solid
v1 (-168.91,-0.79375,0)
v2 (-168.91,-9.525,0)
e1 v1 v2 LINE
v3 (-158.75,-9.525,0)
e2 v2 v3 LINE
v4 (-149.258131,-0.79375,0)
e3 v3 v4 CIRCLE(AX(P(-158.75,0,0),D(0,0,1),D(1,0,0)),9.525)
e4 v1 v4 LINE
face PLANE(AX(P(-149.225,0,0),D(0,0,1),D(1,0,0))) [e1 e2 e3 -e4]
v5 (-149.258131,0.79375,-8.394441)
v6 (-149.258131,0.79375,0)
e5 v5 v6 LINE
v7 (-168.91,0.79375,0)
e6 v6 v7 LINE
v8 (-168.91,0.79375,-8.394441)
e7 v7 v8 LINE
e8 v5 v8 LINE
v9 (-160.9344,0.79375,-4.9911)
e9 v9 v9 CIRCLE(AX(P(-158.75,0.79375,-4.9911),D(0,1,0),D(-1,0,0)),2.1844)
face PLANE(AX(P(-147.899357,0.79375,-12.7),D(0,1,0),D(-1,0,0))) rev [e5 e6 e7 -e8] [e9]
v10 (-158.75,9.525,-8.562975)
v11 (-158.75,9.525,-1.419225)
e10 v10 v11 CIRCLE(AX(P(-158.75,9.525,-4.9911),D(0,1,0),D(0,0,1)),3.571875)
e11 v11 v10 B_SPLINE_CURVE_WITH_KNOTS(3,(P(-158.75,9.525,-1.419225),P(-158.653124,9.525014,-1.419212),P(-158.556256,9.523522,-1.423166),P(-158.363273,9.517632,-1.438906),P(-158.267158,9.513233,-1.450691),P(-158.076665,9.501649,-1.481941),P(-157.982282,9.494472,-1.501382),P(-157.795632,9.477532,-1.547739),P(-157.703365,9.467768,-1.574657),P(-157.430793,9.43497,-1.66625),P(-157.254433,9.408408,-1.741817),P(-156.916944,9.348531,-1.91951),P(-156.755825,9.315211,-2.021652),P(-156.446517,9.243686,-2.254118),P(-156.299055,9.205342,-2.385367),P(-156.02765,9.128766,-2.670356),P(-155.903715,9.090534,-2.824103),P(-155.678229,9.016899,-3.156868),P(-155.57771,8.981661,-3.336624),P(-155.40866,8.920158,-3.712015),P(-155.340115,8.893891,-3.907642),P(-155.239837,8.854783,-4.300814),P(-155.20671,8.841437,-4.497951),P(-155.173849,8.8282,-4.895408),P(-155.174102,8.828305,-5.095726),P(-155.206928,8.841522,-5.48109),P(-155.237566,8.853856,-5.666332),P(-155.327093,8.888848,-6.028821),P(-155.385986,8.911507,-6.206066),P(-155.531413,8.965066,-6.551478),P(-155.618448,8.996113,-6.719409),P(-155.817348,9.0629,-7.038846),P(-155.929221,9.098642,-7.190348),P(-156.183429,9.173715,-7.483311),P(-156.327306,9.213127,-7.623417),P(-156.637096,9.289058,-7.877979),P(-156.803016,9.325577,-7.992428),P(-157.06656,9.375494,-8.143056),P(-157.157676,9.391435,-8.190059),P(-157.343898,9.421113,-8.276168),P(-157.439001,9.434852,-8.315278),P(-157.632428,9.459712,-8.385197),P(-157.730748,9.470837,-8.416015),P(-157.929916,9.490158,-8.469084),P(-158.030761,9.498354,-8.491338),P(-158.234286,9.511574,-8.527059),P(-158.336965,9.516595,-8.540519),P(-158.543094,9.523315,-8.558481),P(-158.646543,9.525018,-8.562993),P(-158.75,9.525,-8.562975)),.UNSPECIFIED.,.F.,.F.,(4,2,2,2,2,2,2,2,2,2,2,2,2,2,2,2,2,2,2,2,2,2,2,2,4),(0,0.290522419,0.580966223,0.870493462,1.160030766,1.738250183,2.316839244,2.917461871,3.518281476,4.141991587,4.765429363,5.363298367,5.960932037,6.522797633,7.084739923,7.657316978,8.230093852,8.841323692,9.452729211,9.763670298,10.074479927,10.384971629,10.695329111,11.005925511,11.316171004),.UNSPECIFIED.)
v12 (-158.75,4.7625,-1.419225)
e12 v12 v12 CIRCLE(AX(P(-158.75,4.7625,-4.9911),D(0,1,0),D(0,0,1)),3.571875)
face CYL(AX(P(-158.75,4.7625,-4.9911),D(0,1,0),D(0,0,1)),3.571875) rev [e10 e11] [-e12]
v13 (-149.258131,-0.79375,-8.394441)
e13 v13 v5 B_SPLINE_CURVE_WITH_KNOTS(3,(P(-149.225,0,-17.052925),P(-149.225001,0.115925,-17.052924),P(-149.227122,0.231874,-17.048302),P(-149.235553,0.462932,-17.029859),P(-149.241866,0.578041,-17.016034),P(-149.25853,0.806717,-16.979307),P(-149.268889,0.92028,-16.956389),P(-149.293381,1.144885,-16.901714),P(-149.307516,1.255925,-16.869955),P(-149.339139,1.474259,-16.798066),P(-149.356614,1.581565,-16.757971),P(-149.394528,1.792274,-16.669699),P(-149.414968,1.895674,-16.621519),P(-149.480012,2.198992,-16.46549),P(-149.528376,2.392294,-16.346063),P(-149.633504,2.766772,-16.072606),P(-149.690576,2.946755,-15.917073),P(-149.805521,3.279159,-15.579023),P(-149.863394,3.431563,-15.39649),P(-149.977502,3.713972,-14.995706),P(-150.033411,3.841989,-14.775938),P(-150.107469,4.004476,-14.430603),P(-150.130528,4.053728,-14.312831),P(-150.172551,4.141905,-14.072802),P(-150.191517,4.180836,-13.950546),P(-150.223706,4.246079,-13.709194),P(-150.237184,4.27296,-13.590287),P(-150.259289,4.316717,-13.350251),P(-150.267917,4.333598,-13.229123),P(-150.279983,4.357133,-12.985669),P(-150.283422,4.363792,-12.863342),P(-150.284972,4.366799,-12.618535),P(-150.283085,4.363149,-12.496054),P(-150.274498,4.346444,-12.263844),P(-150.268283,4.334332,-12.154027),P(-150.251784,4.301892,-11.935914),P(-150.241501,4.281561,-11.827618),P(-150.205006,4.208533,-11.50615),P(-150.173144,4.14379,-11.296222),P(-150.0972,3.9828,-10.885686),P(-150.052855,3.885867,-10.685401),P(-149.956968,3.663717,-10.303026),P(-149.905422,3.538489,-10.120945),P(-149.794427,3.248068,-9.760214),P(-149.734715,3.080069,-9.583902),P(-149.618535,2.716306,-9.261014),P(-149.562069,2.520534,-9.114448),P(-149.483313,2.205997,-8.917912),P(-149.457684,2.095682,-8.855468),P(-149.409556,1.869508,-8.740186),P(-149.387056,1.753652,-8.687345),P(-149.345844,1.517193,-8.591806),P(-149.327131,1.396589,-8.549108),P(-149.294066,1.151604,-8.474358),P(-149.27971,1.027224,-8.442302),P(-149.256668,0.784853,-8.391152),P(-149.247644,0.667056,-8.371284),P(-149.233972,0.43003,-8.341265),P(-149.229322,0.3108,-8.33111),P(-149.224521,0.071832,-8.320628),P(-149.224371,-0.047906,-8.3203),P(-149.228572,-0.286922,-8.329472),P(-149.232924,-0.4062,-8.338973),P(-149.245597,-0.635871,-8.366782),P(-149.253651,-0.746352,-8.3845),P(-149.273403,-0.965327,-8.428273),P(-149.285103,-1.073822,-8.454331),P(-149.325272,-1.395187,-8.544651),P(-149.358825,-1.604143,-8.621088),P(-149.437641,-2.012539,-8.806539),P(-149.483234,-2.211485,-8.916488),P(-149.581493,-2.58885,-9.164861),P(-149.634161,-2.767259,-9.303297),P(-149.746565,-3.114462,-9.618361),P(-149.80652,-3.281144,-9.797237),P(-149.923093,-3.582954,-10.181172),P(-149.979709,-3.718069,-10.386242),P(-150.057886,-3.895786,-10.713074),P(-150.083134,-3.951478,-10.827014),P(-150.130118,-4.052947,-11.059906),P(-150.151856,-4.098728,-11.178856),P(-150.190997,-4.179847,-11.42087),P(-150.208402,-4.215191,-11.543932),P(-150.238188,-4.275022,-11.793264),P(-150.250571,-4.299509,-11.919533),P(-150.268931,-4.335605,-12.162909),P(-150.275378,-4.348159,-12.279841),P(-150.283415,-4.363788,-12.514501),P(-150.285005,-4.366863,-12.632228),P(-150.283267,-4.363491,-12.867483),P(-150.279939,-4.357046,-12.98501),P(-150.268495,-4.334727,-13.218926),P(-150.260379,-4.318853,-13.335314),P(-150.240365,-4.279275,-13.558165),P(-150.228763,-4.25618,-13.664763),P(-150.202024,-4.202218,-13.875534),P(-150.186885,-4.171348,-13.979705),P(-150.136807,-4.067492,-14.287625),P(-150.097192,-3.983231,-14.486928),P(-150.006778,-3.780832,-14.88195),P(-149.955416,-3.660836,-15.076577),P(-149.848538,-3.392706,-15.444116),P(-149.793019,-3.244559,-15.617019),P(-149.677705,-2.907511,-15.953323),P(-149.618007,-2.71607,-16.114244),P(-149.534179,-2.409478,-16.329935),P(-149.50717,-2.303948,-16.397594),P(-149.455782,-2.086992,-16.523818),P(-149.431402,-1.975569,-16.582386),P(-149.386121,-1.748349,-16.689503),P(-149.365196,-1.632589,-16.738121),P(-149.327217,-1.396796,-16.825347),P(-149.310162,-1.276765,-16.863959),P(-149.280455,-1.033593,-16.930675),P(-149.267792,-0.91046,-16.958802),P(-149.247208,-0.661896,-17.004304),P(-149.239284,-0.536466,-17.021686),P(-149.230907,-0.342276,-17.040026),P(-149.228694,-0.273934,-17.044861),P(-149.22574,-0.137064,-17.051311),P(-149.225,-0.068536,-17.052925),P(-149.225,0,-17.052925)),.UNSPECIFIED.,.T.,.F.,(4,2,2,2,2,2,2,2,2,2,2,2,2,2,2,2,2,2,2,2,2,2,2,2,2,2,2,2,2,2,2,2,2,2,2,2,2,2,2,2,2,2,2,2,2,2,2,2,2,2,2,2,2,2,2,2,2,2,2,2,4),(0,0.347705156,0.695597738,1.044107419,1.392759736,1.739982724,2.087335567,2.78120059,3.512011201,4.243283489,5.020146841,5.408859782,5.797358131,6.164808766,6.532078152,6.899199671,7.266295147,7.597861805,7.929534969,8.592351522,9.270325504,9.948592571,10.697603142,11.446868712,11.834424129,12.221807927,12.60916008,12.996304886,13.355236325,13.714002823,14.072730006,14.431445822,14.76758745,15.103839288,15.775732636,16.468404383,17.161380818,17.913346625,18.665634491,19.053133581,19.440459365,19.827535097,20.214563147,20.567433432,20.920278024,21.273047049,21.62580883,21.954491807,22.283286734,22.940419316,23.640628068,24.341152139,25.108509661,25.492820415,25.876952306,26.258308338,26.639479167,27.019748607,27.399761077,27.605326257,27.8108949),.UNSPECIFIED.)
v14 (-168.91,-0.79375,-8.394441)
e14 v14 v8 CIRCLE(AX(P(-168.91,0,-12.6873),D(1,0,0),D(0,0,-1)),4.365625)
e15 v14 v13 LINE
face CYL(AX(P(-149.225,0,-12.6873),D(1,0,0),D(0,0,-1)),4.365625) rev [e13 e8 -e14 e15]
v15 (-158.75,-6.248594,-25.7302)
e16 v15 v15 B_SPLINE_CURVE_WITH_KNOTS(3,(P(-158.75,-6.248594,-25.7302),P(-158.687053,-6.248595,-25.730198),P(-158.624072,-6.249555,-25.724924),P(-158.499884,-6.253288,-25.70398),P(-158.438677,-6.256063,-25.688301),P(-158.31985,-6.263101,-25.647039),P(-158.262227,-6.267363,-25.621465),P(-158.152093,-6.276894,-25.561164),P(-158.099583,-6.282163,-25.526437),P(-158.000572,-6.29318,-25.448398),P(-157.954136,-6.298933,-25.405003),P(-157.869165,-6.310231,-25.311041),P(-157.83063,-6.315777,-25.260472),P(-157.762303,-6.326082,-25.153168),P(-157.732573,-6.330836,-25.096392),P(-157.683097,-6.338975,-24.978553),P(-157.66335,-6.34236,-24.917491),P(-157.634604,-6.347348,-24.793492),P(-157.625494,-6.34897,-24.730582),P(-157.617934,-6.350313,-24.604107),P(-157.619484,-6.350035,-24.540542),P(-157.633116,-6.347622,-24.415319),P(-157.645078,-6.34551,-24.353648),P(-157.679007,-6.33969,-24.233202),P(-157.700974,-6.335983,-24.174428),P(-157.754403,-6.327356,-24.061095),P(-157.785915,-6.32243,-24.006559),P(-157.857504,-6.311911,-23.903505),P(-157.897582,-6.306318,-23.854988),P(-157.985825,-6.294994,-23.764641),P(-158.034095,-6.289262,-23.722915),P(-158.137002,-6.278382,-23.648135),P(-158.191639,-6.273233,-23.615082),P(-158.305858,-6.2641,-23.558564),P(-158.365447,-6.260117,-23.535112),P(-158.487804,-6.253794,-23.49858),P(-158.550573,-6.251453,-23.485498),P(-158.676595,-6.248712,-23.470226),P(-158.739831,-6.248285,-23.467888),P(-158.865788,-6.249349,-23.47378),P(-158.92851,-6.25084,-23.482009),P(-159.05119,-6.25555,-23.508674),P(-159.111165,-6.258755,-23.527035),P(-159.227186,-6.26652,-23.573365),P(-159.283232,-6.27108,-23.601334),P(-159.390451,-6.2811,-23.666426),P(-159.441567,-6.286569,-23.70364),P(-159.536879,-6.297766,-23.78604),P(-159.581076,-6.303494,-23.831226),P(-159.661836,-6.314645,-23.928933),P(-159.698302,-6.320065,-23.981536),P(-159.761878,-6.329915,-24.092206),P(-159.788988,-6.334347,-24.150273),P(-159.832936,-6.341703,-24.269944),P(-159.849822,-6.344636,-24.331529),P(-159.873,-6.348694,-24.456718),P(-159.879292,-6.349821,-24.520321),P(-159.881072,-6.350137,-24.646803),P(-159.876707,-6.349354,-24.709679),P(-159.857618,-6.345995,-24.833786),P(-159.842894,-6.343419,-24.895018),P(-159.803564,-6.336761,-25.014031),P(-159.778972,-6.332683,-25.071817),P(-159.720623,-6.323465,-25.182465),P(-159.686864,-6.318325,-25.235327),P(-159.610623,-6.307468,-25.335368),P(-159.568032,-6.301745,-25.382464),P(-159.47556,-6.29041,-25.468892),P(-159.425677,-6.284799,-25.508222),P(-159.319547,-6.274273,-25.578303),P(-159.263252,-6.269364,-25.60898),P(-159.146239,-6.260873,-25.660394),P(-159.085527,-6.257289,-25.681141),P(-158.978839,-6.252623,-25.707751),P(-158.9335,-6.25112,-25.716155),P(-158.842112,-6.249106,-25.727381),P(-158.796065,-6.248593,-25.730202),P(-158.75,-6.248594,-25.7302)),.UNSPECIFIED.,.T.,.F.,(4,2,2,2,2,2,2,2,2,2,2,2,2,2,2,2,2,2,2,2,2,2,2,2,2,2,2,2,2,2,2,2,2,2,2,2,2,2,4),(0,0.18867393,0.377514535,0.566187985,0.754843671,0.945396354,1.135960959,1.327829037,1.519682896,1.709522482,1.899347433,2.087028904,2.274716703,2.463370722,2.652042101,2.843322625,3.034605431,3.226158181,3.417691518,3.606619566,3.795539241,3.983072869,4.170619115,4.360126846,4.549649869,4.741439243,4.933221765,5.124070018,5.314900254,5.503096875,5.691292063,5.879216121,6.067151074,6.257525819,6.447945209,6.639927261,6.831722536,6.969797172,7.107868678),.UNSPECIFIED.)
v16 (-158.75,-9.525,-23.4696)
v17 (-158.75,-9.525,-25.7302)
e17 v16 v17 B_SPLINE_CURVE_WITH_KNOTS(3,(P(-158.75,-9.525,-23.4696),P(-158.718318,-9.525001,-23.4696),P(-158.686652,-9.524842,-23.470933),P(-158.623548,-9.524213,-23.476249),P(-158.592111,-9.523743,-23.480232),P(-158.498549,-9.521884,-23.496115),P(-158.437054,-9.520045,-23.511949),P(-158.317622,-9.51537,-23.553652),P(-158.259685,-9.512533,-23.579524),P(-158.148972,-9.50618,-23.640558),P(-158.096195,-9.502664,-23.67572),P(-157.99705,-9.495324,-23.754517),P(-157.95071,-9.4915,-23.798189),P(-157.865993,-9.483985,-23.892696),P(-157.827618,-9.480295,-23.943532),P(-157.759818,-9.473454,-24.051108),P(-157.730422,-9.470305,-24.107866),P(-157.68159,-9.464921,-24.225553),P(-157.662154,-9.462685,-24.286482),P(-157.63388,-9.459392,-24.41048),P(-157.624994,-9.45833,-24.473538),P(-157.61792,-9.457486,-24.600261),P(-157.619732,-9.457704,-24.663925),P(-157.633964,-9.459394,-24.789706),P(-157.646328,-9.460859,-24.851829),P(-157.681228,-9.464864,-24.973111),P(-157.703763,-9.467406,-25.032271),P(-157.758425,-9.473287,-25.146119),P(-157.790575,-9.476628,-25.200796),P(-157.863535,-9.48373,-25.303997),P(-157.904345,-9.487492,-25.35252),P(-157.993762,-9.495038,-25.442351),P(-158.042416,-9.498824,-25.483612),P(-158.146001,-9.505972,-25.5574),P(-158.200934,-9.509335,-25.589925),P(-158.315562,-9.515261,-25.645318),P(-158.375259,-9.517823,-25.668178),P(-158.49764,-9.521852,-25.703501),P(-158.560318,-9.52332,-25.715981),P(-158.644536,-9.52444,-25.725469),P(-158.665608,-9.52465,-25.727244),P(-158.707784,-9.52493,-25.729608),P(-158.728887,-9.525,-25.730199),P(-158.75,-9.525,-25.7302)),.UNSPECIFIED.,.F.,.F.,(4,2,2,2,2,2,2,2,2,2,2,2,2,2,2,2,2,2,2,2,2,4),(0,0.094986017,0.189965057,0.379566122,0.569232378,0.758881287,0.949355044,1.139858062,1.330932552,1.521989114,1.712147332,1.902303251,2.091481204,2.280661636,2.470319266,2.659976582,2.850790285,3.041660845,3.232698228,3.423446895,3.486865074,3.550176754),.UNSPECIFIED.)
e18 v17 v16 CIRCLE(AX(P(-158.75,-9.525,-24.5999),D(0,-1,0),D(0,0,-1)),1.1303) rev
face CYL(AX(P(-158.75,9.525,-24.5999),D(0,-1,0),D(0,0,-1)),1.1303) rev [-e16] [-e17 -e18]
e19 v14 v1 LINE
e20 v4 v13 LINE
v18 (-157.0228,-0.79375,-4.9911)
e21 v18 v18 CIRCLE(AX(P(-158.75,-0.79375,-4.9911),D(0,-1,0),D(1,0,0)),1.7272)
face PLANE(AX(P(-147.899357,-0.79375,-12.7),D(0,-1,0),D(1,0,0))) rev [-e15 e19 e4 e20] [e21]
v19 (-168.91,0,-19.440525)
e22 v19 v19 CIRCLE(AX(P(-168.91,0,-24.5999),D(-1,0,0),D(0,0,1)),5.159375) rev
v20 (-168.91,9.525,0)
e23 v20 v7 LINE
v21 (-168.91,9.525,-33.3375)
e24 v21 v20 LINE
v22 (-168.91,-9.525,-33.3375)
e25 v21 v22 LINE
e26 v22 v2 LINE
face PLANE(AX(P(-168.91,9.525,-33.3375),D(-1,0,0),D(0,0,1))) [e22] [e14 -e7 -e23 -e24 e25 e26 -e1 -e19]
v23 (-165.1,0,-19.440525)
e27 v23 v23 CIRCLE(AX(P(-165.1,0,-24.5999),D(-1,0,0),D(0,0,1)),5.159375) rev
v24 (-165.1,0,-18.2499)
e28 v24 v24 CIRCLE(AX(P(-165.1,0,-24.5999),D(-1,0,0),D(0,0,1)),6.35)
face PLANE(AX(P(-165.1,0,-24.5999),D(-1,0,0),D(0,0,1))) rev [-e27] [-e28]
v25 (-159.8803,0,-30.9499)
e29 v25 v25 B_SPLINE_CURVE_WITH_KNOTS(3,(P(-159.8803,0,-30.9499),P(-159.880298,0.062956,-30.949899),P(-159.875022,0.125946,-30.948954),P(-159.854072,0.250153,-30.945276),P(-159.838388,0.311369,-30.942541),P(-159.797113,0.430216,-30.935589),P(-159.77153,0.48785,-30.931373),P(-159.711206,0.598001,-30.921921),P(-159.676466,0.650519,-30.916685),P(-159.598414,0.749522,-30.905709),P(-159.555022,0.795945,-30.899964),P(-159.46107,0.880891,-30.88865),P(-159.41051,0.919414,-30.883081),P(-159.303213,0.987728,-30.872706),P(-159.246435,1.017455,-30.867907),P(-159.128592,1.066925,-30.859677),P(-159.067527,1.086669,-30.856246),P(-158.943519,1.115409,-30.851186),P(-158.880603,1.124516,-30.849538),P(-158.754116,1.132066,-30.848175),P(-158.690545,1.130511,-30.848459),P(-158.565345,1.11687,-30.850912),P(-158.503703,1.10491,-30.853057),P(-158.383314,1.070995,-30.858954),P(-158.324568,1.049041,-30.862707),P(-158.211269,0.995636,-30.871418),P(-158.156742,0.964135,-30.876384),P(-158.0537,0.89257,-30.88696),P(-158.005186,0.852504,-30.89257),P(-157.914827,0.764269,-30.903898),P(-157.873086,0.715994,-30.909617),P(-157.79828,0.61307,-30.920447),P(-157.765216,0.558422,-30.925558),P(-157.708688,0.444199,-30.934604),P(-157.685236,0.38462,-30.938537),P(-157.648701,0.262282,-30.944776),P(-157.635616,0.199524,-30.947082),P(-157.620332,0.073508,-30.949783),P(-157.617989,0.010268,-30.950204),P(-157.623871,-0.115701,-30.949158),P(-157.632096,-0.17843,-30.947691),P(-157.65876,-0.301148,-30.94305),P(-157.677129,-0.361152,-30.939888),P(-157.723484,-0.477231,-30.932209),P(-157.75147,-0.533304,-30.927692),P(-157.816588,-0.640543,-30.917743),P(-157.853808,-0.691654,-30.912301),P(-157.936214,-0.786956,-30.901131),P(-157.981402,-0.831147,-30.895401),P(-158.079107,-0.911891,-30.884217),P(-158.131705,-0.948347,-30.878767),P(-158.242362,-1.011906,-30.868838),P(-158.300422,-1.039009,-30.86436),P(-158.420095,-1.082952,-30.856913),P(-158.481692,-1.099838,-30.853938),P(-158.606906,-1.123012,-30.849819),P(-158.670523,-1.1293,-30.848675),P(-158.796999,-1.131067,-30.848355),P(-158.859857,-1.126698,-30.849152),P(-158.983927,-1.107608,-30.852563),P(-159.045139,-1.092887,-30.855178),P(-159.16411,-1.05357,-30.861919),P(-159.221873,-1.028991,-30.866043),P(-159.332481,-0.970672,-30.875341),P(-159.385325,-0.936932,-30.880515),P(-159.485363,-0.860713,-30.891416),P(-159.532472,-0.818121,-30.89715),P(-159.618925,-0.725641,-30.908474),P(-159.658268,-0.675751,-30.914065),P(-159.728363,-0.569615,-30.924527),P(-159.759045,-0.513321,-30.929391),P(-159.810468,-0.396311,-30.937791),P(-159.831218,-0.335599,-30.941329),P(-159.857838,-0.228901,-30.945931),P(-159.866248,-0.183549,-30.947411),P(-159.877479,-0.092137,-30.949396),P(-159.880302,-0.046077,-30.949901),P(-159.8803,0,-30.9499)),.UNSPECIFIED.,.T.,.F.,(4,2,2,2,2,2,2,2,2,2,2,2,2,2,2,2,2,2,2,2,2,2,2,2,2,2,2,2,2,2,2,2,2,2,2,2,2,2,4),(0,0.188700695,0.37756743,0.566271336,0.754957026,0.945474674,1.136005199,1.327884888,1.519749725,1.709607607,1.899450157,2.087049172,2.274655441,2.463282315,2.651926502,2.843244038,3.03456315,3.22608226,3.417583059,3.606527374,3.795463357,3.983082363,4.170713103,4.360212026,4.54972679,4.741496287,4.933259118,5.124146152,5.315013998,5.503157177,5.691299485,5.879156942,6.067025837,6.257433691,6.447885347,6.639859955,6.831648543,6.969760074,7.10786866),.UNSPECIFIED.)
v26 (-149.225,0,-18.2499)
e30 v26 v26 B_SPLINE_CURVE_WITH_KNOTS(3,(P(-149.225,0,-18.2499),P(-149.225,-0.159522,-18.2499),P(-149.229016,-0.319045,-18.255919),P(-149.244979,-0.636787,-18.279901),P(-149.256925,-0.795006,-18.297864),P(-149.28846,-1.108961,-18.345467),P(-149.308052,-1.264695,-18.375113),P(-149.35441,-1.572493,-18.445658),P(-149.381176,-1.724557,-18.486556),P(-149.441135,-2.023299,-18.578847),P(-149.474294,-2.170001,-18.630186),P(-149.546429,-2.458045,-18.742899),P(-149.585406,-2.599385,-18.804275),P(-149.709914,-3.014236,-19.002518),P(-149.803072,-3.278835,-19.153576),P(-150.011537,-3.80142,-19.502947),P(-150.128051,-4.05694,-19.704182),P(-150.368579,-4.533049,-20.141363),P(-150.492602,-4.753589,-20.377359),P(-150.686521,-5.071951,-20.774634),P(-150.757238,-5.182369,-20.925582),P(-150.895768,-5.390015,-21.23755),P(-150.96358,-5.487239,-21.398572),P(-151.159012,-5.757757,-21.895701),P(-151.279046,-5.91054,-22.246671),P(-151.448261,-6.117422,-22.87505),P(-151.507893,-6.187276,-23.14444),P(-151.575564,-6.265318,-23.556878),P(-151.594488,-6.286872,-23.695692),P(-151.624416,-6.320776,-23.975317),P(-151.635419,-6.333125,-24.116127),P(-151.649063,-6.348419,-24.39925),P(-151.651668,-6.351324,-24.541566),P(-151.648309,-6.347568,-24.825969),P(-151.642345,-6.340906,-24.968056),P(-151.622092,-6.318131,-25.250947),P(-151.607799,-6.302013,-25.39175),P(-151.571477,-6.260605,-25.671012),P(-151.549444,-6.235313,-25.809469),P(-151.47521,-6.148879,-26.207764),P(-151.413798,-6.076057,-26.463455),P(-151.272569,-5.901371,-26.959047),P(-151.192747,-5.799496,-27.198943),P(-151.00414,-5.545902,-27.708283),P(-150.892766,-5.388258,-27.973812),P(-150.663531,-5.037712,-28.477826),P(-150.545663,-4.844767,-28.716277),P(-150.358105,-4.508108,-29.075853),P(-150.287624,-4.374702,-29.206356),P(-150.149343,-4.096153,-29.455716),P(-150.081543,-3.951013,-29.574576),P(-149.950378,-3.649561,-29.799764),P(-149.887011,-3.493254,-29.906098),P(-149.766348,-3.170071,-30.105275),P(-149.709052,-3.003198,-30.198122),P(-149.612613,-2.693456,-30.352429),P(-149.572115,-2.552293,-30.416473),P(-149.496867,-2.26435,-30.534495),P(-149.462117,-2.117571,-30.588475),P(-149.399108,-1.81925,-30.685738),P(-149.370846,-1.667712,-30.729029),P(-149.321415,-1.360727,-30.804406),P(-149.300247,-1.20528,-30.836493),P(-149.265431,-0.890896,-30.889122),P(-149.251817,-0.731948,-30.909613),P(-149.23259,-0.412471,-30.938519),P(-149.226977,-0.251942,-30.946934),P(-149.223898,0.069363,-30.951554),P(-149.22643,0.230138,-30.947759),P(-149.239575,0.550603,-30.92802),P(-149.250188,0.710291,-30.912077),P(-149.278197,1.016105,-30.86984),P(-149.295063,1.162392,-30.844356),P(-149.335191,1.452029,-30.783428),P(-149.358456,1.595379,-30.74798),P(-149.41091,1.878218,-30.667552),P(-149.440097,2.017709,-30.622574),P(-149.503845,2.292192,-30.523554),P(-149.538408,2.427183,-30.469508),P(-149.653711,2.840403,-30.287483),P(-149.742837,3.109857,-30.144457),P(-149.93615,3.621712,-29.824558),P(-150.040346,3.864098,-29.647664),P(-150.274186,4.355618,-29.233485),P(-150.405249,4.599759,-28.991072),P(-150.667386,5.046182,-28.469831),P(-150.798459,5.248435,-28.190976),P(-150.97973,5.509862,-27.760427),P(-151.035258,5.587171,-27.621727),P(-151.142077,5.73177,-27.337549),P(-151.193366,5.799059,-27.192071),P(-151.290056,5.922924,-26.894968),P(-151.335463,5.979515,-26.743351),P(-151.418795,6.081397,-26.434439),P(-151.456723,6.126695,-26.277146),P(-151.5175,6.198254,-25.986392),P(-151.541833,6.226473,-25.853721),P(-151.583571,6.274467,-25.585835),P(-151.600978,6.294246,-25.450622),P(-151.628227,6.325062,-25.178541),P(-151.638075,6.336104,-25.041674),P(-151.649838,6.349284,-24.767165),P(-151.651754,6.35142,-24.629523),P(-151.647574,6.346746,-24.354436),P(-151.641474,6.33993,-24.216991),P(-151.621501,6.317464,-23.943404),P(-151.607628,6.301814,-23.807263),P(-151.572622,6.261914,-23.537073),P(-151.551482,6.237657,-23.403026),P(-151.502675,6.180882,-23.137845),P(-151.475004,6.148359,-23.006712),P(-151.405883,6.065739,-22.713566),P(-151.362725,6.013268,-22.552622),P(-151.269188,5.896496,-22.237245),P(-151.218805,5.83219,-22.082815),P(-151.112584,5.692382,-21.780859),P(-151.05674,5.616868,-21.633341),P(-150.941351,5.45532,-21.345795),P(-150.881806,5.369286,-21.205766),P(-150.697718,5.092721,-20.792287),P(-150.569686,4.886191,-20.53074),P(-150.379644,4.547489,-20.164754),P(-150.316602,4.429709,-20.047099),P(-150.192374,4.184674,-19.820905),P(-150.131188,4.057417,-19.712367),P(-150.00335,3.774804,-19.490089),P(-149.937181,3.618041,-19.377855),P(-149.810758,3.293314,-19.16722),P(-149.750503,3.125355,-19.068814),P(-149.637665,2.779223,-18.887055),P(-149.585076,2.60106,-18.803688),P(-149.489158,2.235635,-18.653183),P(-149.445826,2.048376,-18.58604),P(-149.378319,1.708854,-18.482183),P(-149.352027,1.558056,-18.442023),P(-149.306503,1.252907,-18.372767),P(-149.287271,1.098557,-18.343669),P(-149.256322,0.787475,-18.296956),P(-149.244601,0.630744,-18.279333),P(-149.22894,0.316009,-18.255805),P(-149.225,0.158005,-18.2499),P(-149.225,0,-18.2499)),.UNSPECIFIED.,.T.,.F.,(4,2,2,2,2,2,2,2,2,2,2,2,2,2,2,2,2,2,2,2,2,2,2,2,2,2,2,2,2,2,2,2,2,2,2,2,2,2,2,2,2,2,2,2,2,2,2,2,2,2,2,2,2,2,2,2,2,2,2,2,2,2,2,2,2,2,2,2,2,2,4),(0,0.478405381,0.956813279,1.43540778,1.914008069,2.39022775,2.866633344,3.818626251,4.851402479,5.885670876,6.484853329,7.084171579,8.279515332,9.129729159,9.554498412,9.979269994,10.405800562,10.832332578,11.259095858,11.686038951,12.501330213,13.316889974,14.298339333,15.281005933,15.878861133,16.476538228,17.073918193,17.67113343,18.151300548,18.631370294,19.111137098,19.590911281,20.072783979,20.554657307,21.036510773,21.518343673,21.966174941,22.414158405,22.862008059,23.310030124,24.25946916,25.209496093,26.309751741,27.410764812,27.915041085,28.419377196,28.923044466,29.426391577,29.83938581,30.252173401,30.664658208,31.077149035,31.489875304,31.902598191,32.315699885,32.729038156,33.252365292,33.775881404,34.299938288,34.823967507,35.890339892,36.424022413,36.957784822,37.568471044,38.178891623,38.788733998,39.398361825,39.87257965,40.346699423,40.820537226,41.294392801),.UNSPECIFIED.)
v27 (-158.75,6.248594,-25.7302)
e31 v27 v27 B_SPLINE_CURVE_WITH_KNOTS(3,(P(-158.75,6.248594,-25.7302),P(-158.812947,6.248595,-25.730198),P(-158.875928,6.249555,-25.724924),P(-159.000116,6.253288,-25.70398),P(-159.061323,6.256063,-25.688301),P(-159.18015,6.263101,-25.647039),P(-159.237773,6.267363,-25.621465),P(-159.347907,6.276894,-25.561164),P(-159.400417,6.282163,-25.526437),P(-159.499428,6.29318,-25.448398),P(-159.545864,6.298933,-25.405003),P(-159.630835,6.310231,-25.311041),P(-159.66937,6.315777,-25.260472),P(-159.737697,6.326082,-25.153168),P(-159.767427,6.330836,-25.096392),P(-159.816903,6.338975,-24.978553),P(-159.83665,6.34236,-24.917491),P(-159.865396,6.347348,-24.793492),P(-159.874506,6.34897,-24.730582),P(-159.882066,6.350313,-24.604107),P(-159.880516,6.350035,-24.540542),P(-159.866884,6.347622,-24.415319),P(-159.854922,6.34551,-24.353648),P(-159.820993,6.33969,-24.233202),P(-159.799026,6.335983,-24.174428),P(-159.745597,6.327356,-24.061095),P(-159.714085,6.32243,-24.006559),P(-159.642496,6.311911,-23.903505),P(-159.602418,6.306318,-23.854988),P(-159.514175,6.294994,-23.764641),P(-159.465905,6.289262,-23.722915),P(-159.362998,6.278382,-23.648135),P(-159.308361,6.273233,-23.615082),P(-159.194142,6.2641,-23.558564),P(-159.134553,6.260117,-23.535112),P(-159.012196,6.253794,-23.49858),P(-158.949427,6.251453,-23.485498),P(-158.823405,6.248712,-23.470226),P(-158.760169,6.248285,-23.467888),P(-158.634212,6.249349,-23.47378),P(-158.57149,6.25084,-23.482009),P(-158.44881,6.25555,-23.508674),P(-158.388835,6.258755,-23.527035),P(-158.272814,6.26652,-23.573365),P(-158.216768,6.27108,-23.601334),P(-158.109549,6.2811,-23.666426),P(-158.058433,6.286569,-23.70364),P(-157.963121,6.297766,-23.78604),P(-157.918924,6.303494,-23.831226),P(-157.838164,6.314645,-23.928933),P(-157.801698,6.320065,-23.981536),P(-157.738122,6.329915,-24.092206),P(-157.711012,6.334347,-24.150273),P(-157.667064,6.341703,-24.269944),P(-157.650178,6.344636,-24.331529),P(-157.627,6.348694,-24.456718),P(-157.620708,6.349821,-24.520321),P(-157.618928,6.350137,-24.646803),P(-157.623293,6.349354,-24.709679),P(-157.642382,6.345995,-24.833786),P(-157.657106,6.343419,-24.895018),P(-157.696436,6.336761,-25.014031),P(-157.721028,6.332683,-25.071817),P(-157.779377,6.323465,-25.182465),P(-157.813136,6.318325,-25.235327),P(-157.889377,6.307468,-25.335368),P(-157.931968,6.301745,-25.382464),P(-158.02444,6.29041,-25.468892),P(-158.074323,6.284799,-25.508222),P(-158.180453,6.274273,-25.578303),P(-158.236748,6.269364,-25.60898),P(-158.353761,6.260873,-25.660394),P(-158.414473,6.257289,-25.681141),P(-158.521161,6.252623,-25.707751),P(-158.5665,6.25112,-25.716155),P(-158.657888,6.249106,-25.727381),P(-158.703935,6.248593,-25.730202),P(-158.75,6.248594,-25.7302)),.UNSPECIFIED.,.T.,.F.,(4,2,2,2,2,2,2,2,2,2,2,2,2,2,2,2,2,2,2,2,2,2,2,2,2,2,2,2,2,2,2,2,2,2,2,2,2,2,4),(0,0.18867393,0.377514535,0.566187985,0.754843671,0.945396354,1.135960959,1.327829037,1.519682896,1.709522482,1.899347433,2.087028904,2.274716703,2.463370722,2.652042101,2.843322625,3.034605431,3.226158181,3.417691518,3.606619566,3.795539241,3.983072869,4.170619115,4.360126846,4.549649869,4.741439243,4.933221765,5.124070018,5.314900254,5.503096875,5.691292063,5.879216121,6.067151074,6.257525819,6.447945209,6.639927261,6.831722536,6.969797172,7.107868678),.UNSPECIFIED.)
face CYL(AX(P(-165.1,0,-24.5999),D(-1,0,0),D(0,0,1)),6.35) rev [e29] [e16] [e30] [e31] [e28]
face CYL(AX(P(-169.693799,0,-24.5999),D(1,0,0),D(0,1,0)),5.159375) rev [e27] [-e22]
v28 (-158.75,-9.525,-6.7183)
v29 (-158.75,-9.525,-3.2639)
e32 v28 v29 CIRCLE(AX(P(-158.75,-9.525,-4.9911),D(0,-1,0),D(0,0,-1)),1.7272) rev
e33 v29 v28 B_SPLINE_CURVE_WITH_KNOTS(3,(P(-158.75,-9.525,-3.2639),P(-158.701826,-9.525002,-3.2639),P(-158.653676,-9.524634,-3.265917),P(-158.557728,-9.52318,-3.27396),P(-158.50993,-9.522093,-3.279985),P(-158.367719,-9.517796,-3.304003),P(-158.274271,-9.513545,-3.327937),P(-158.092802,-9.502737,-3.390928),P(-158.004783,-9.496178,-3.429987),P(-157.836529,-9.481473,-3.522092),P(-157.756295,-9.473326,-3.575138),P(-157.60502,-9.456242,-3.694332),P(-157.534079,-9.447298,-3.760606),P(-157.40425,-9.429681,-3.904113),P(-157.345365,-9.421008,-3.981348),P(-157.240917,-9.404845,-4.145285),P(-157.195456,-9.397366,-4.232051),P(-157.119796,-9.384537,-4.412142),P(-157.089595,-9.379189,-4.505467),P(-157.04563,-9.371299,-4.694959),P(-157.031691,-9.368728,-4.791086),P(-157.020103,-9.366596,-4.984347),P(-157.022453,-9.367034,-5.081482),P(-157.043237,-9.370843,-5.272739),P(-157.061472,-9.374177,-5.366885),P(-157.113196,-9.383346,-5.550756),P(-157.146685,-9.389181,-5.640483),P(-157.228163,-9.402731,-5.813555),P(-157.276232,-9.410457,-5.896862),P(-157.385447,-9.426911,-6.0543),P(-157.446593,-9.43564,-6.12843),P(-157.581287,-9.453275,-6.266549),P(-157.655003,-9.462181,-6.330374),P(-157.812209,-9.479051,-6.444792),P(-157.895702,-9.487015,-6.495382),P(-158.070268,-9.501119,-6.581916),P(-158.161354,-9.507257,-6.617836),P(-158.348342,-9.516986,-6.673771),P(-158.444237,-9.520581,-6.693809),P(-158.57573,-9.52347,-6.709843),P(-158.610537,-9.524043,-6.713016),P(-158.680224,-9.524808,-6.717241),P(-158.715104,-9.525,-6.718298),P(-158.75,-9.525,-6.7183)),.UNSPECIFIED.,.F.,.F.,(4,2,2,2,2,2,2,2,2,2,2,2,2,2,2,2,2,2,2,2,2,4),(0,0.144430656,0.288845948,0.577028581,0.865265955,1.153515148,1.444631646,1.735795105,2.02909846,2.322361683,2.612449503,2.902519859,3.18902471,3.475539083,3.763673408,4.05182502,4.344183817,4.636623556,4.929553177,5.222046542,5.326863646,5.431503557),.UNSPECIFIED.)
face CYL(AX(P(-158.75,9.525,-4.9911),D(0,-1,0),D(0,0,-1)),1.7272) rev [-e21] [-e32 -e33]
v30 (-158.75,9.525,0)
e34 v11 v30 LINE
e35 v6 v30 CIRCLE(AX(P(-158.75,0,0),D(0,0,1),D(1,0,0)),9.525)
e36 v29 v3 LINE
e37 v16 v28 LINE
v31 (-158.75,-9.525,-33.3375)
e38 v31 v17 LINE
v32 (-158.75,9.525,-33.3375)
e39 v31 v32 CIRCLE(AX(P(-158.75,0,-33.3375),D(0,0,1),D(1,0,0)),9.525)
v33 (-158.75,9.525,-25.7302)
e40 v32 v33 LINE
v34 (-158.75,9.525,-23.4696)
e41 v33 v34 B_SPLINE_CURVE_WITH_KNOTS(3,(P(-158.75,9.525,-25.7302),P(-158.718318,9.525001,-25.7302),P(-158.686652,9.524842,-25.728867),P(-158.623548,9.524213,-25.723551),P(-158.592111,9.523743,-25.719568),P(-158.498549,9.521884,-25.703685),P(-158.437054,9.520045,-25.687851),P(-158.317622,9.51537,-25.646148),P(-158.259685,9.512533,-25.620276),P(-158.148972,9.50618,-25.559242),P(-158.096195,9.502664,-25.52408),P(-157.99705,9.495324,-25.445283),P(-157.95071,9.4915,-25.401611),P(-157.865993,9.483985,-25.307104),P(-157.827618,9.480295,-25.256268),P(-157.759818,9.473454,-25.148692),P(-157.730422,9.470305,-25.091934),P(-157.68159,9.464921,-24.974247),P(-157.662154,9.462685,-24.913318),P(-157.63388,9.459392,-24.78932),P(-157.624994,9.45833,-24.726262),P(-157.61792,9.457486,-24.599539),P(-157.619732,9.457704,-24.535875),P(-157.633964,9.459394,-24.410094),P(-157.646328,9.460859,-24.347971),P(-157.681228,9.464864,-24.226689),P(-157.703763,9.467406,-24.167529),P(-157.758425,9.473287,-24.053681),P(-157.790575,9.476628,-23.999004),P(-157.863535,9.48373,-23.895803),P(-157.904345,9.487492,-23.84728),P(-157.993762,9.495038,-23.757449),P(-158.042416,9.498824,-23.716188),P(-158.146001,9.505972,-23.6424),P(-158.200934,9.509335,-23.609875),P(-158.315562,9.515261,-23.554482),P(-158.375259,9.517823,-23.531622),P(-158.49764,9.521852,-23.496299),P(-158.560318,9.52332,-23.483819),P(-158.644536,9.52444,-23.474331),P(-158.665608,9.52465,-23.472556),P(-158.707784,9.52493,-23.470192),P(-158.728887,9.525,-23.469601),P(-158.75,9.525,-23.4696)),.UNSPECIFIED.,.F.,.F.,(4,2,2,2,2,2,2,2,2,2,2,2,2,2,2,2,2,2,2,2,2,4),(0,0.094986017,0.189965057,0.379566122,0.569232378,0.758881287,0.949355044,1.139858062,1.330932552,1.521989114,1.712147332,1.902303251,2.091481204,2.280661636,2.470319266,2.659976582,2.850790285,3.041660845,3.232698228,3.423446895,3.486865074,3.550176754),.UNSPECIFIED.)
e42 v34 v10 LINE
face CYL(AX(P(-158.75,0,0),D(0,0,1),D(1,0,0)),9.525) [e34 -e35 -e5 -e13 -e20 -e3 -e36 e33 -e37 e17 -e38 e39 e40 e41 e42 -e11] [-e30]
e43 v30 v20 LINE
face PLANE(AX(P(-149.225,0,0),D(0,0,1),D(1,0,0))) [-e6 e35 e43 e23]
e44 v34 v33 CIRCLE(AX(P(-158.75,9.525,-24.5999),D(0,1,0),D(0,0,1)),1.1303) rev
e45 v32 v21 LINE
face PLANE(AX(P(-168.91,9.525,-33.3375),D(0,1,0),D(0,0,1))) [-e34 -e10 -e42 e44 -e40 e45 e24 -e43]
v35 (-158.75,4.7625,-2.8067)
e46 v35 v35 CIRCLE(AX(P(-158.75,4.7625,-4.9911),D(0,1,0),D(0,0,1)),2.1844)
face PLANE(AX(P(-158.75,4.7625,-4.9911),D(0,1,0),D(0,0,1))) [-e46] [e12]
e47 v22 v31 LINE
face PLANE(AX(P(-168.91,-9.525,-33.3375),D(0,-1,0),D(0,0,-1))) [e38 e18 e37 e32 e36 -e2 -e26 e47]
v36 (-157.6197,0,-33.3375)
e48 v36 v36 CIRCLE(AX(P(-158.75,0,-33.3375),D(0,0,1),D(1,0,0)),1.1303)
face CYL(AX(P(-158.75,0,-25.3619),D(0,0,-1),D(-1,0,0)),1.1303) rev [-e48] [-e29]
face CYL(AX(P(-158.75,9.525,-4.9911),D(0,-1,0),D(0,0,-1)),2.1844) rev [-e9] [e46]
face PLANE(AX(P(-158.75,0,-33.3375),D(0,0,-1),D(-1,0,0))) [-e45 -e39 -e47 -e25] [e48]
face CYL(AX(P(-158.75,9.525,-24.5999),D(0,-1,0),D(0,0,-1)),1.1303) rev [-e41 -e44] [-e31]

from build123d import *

# Parameters (mm, degrees)
SKETCH1_W              = 9.525
SKETCH1_H              = 33.3375
COMBINE1_START         = -165.1
COMBINE1_OUTLINE_R     = 6.35
COMBINE1_DEPTH         = 17.1
COMBINE1_START_2       = -168.91
COMBINE1_2_OUTLINE_R   = 5.159375
COMBINE1_2_DEPTH       = 3.81
COMBINE1_3_OUTLINE_R   = 6.35
COMBINE1_3_DEPTH       = 10.107803
COMBINE1_4_OUTLINE_R   = 6.35
COMBINE1_4_OUTLINE_R_2 = 5.159375
COMBINE1_4_DEPTH       = 3.81
COMBINE1_START_3       = 4.7625
COMBINE1_5_OUTLINE_R   = 3.571875
COMBINE1_5_OUTLINE_R_2 = 1.1303
COMBINE1_5_DEPTH       = 4.7625
COMBINE1_START_4       = -11
COMBINE1_6_OUTLINE_R   = 1.7272
COMBINE1_6_OUTLINE_R_2 = 1.1303
COMBINE1_6_DEPTH       = 15.7625
COMBINE1_START_5       = 0.793749963
COMBINE1_7_OUTLINE_R   = 2.1844
COMBINE1_7_OUTLINE_R_2 = 1.7272
COMBINE1_7_DEPTH       = 3.968750037
COMBINE1_START_6       = -33.3375
COMBINE1_8_OUTLINE_R   = 1.1303
COMBINE1_8_DEPTH       = 2.48900636


with BuildPart() as part:
    # Sketch1 → Revolve1 (revolve)
    with BuildSketch(Plane(origin=(0, 0, 0), x_dir=(1, 0, 0), z_dir=(0, 1, 0))):
        with Locations((-153.9875, 16.66875)):
            Rectangle(SKETCH1_W, SKETCH1_H)
    revolve(axis=Axis((-158.75, 0, 0), (0, 0, -1)))

    # Combine1: read off the stored shape, not the designer's step
    # Combine1 outline → Combine1 (cut)
    with BuildSketch(Plane.YZ.offset(COMBINE1_START)):
        with BuildLine():
            Line((0.79375, 0), (-0.79375, 0))
            Line((-0.79375, 0), (-0.793749936, -8.394440501))
            ThreePointArc((-0.793749936, -8.394440501), (-1e-08, -17.052925), (0.793749959, -8.394440505))
            Line((0.793749959, -8.394440505), (0.79375, 0))
        make_face()
        with Locations((0, -24.5999)):
            Circle(COMBINE1_OUTLINE_R)
    extrude(amount=COMBINE1_DEPTH, mode=Mode.SUBTRACT)

    # Combine1 2 outline → Combine1 2 (cut)
    with BuildSketch(Plane.YZ.offset(COMBINE1_START_2)):
        with BuildLine():
            Line((0.79375, 0), (-0.79375, 0))
            Line((-0.79375, 0), (-0.793749936, -8.394440501))
            ThreePointArc((-0.793749936, -8.394440501), (-1e-08, -17.052925), (0.793749959, -8.394440505))
            Line((0.793749959, -8.394440505), (0.79375, 0))
        make_face()
        with Locations((0, -24.5999)):
            Circle(COMBINE1_2_OUTLINE_R)
    extrude(amount=COMBINE1_2_DEPTH, mode=Mode.SUBTRACT)

    # Combine1 3 outline → Combine1 3 (add)
    with BuildSketch(Plane.YZ.offset(COMBINE1_START_2)):
        with BuildLine():
            Line((-0.79375, 0), (-9.525, 0))
            Line((-9.525, 0), (-9.525, -33.3375))
            Line((-9.525, -33.3375), (9.525, -33.3375))
            Line((9.525, -33.3375), (9.525, 0))
            Line((9.525, 0), (0.79375, 0))
            Line((0.79375, 0), (0.793749959, -8.394440505))
            ThreePointArc((0.793749959, -8.394440505), (-1e-08, -17.052925), (-0.793749936, -8.394440501))
            Line((-0.793749936, -8.394440501), (-0.79375, 0))
        make_face()
        with Locations((0, -24.5999)):
            Circle(COMBINE1_3_OUTLINE_R, mode=Mode.SUBTRACT)
    extrude(amount=COMBINE1_3_DEPTH)

    # Combine1 4 outline → Combine1 4 (add)
    with BuildSketch(Plane.YZ.offset(COMBINE1_START_2)):
        with Locations((0, -24.5999)):
            Circle(COMBINE1_4_OUTLINE_R)
        with Locations((0, -24.5999)):
            Circle(COMBINE1_4_OUTLINE_R_2, mode=Mode.SUBTRACT)
    extrude(amount=COMBINE1_4_DEPTH)

    # Combine1 5 outline → Combine1 5 (cut)
    with BuildSketch(Plane(origin=(0, 0, 0), x_dir=(1, 0, 0), z_dir=(0, 1, 0)).offset(COMBINE1_START_3)):
        with Locations((-158.75, 4.9911)):
            Circle(COMBINE1_5_OUTLINE_R)
        with Locations((-158.75, 24.5999)):
            Circle(COMBINE1_5_OUTLINE_R_2)
    extrude(amount=COMBINE1_5_DEPTH, mode=Mode.SUBTRACT)

    # Combine1 6 outline → Combine1 6 (cut)
    with BuildSketch(Plane(origin=(0, 0, 0), x_dir=(1, 0, 0), z_dir=(0, 1, 0)).offset(COMBINE1_START_4)):
        with Locations((-158.75, 4.9911)):
            Circle(COMBINE1_6_OUTLINE_R)
        with Locations((-158.75, 24.5999)):
            Circle(COMBINE1_6_OUTLINE_R_2)
    extrude(amount=COMBINE1_6_DEPTH, mode=Mode.SUBTRACT)

    # Combine1 7 outline → Combine1 7 (cut)
    with BuildSketch(Plane(origin=(0, 0, 0), x_dir=(1, 0, 0), z_dir=(0, 1, 0)).offset(COMBINE1_START_5)):
        with Locations((-158.75, 4.9911)):
            Circle(COMBINE1_7_OUTLINE_R)
        with Locations((-158.75, 4.9911)):
            Circle(COMBINE1_7_OUTLINE_R_2, mode=Mode.SUBTRACT)
    extrude(amount=COMBINE1_7_DEPTH, mode=Mode.SUBTRACT)

    # Combine1 8 outline → Combine1 8 (cut)
    with BuildSketch(Plane.XY.offset(COMBINE1_START_6)):
        with Locations((-158.75, 0)):
            Circle(COMBINE1_8_OUTLINE_R)
    extrude(amount=COMBINE1_8_DEPTH, mode=Mode.SUBTRACT)


solid = part.part
